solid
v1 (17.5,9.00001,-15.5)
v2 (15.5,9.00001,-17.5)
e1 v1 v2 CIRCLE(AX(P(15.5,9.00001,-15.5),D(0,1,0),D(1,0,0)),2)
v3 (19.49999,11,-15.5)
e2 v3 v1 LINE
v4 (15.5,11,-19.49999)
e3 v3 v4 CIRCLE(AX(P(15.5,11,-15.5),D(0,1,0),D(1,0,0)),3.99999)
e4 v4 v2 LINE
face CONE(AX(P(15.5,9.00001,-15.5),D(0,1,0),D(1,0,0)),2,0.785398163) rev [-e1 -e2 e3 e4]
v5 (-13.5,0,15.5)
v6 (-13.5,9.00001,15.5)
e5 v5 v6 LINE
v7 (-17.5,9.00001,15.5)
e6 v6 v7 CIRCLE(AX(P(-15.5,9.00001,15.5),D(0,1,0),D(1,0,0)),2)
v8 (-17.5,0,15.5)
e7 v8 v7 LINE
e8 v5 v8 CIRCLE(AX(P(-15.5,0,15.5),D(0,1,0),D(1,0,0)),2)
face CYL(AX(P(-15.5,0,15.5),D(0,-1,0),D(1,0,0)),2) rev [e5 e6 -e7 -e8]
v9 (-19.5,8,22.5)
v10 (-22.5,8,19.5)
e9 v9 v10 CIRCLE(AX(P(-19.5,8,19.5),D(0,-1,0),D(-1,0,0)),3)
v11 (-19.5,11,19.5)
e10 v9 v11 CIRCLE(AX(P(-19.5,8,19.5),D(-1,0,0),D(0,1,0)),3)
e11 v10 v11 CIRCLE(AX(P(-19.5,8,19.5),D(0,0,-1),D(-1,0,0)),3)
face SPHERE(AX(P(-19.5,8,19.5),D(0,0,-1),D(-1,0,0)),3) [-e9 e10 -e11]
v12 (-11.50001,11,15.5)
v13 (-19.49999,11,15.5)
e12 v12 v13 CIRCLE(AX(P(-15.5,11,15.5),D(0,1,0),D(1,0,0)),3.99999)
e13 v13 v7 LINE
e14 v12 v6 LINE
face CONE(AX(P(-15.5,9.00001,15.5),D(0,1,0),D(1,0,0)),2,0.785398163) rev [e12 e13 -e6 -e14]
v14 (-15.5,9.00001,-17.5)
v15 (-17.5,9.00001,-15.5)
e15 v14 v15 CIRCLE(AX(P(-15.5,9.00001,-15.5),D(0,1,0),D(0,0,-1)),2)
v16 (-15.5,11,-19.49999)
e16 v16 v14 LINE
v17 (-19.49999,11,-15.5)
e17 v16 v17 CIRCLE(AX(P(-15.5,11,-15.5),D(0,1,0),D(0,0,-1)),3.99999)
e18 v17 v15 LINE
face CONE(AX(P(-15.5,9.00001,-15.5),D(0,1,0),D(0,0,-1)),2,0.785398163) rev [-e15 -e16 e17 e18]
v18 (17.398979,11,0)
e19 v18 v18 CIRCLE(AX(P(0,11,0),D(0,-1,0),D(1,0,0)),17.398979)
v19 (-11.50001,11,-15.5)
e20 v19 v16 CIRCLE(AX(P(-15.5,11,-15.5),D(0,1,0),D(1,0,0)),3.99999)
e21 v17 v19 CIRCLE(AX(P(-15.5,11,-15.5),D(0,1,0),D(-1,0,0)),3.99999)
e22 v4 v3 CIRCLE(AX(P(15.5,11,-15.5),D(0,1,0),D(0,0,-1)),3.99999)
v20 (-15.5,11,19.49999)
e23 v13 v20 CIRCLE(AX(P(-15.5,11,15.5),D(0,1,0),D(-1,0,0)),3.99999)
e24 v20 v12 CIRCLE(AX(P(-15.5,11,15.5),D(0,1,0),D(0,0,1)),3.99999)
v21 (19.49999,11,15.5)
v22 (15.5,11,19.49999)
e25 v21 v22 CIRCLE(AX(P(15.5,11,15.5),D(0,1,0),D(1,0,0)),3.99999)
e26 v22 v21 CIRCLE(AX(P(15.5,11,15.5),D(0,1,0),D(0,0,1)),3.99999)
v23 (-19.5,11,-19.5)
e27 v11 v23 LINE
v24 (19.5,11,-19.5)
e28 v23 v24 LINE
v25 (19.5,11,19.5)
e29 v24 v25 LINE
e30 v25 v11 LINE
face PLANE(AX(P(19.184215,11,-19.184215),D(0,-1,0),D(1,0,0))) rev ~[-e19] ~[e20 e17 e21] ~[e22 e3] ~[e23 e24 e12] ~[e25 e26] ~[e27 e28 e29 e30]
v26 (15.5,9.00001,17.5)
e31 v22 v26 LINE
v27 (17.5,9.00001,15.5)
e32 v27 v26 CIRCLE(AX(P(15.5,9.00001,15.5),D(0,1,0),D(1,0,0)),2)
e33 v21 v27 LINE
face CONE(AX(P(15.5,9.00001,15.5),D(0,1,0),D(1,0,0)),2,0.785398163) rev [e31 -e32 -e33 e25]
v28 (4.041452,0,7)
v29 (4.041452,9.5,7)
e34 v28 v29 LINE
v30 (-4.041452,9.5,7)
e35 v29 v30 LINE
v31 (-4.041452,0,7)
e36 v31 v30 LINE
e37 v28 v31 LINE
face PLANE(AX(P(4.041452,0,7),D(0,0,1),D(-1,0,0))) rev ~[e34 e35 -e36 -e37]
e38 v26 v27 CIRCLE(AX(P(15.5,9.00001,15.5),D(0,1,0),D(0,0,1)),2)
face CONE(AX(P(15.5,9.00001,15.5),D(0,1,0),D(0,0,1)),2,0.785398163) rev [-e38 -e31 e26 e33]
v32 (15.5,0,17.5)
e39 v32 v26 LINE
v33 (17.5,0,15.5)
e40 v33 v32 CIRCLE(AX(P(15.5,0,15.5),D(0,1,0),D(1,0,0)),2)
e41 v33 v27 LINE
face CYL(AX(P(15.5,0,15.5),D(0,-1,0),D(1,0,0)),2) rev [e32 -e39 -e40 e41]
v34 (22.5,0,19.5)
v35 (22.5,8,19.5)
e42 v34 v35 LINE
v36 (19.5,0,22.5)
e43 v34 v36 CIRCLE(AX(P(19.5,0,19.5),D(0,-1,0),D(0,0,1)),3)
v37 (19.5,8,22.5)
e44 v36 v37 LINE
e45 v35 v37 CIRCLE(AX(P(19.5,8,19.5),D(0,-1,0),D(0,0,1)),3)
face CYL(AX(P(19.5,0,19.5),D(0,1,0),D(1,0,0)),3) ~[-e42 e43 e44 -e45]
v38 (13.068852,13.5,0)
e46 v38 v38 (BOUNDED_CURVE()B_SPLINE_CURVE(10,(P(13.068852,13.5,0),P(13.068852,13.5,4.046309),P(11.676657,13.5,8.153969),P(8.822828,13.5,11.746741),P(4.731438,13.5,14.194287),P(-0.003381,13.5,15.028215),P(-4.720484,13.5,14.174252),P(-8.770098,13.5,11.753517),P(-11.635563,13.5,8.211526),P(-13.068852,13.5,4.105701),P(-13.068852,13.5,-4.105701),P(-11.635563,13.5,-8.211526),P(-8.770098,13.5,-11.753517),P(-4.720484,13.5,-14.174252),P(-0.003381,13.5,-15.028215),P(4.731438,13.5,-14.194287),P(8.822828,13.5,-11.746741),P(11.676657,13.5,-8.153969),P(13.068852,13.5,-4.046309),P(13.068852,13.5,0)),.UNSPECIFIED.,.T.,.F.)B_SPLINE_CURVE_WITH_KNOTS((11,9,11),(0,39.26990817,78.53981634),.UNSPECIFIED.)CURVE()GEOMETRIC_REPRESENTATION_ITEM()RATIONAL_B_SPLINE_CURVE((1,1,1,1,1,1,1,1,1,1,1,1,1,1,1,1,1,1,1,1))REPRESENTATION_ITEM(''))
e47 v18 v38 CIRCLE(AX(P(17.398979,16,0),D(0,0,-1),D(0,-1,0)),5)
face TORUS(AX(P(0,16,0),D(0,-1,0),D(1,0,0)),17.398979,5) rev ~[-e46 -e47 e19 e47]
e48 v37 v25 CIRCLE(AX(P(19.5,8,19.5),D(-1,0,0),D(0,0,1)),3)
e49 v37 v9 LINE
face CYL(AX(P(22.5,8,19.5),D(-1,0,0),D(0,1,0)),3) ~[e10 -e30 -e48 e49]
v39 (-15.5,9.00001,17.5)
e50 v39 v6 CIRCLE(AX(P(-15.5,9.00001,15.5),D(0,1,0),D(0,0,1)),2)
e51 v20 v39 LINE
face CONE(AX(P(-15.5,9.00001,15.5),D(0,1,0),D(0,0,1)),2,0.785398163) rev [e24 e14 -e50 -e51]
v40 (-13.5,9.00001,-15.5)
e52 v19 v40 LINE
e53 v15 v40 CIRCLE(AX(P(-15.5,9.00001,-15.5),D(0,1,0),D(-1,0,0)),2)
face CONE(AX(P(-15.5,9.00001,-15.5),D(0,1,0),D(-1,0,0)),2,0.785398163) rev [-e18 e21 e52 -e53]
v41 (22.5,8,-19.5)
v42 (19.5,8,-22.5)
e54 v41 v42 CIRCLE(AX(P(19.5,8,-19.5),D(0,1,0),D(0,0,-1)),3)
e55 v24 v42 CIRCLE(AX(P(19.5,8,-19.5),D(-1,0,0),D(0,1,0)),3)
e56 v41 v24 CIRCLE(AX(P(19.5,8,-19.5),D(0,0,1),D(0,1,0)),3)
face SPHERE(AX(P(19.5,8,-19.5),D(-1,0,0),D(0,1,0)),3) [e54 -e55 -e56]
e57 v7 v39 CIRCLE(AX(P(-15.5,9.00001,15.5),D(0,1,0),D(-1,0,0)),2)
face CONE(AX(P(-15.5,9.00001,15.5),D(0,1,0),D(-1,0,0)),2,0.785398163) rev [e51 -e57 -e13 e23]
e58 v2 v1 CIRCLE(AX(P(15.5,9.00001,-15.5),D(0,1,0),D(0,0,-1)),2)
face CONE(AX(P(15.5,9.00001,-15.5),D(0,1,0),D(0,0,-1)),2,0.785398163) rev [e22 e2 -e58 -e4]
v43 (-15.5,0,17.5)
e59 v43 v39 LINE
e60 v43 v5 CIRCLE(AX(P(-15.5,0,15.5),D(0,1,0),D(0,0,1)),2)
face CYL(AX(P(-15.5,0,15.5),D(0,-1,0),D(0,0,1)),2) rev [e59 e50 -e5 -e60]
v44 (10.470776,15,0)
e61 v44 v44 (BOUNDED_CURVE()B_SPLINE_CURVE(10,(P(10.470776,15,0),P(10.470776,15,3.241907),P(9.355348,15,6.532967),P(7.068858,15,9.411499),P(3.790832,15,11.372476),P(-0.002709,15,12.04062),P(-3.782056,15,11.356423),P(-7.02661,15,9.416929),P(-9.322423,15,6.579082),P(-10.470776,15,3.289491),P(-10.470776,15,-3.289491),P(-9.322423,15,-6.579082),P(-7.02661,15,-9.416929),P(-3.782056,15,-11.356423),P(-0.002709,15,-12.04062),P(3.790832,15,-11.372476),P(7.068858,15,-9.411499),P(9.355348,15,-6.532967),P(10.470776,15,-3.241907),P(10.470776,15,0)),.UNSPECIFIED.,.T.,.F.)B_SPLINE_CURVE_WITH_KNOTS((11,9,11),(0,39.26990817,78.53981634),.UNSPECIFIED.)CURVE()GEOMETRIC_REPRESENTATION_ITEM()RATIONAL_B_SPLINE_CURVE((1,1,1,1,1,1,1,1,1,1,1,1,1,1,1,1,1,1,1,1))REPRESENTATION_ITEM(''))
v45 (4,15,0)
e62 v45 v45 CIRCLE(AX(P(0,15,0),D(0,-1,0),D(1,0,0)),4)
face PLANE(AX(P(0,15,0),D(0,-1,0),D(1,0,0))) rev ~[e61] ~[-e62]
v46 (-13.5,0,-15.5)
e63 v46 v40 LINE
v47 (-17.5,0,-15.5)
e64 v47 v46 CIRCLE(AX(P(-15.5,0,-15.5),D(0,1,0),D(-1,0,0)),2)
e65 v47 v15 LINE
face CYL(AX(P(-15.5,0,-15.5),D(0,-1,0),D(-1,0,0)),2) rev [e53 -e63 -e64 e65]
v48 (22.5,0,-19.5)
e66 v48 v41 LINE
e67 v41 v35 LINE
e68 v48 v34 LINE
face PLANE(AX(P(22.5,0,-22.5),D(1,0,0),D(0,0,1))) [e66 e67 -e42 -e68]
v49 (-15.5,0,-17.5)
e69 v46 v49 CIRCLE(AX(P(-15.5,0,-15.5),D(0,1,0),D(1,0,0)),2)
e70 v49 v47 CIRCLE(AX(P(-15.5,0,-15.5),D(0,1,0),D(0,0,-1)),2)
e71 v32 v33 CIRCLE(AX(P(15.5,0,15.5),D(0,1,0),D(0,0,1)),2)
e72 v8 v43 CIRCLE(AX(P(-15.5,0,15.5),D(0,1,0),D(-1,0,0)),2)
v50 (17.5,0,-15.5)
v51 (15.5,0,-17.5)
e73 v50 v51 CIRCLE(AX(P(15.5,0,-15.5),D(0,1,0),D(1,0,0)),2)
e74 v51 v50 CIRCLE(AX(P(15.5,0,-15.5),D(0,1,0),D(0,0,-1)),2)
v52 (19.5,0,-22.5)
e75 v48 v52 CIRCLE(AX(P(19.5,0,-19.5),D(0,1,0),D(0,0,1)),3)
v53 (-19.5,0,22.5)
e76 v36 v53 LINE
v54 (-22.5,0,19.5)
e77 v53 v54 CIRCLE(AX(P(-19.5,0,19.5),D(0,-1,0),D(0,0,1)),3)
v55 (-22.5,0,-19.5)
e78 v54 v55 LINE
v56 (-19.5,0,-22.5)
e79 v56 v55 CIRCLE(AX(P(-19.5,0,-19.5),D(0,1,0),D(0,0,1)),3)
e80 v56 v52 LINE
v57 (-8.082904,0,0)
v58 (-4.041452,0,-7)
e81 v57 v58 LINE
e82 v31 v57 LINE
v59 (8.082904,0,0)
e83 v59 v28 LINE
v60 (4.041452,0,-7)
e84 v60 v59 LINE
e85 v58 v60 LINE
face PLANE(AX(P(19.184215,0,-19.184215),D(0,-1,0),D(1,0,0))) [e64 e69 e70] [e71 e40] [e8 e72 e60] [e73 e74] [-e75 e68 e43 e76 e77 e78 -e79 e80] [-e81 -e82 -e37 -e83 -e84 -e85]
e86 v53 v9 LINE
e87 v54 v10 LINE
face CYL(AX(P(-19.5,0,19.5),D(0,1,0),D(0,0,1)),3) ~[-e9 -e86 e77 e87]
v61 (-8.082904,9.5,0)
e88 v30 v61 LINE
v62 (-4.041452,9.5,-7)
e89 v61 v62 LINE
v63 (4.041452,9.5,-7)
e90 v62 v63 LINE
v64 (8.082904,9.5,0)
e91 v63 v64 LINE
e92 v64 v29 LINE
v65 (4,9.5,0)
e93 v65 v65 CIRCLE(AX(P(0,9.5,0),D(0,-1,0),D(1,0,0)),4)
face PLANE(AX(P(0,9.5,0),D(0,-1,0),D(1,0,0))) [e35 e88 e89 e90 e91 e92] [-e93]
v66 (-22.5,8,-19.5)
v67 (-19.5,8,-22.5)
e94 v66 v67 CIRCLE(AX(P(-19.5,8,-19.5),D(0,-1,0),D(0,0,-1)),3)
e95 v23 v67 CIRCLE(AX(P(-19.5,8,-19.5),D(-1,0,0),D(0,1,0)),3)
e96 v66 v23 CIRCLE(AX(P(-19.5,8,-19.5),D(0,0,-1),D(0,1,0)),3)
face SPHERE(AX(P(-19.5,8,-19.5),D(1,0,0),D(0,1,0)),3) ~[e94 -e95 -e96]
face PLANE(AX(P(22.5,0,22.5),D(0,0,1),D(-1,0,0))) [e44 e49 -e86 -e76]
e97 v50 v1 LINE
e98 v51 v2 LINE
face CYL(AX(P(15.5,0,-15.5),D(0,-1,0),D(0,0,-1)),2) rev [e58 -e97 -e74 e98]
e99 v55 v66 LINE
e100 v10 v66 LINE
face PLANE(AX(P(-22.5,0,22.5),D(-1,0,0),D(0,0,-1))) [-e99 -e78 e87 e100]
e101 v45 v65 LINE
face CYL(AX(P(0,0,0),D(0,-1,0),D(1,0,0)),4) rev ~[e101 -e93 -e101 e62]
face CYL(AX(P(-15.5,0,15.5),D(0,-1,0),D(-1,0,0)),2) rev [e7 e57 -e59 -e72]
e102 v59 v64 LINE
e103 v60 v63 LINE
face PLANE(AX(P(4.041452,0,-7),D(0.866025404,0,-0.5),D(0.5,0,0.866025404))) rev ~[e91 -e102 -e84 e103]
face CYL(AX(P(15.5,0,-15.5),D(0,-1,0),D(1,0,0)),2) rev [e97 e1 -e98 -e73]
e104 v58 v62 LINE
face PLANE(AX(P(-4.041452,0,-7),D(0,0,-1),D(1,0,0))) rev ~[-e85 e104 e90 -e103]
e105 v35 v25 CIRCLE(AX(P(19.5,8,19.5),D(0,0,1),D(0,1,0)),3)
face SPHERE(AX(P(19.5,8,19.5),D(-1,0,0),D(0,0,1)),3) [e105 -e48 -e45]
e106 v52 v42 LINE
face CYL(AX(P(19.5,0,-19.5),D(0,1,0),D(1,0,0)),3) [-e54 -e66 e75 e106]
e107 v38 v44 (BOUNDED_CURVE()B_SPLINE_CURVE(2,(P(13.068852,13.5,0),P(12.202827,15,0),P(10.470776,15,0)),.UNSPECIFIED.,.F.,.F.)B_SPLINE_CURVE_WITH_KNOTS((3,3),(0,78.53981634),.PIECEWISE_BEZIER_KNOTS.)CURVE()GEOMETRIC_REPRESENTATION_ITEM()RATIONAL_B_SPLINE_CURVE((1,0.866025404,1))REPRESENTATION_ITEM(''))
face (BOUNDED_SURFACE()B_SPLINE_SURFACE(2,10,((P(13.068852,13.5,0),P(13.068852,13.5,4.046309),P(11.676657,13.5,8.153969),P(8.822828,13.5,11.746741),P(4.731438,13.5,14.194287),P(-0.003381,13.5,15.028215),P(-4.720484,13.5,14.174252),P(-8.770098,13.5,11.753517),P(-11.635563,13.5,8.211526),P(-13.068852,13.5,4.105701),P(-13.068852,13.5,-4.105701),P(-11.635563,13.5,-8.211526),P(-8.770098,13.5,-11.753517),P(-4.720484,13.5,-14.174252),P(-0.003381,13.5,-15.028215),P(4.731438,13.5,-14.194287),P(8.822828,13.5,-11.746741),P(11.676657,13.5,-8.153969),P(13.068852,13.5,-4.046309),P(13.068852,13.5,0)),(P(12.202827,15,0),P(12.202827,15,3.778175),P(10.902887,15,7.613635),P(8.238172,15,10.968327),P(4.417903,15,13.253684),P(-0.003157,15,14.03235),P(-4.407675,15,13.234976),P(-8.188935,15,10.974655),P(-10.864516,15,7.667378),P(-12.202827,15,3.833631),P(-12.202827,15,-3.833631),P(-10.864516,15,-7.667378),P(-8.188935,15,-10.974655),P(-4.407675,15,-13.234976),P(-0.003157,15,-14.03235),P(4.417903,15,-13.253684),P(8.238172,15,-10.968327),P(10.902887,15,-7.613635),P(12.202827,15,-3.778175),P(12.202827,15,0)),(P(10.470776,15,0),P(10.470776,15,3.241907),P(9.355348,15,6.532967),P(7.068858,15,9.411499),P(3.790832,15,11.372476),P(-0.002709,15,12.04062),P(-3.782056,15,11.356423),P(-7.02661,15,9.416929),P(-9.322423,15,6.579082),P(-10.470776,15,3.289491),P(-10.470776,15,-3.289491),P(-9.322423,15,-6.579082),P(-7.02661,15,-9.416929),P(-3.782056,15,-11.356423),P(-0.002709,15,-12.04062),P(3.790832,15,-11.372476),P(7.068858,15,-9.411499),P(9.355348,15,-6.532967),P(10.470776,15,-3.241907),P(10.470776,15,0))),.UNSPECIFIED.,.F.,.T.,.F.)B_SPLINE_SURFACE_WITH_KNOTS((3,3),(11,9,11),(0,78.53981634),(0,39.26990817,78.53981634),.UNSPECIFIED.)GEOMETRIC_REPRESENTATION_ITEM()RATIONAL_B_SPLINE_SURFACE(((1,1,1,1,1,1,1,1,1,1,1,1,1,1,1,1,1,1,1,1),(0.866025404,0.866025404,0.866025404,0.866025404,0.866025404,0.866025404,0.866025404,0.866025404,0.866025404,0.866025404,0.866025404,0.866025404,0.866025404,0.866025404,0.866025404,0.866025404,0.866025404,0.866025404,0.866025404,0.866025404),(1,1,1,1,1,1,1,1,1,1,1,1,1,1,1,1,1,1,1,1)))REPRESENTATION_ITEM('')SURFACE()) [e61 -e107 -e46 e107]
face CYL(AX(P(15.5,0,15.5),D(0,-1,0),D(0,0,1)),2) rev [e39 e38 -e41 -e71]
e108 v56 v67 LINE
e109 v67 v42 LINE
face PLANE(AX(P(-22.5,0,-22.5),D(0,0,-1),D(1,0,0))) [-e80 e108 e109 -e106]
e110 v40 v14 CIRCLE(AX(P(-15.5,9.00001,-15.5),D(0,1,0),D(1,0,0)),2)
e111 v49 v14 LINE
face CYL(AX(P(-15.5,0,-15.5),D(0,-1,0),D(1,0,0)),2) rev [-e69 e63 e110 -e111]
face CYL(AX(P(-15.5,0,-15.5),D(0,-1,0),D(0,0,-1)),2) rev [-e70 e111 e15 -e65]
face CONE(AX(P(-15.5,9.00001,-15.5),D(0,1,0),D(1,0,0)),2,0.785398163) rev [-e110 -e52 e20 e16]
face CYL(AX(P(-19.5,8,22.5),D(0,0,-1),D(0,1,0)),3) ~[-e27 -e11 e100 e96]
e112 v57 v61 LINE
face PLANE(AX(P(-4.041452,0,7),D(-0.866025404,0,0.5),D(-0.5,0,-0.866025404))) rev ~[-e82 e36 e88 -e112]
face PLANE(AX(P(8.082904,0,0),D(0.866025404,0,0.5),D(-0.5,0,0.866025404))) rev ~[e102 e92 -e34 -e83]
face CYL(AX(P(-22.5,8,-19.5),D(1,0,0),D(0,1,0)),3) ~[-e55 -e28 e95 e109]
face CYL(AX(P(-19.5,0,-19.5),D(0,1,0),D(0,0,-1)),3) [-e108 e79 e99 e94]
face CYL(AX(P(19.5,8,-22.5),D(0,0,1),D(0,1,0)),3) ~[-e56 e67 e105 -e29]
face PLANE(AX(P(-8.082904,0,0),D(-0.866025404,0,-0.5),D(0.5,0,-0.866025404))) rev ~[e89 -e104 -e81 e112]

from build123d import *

# Parameters (mm, degrees)
F0_R     = 12.5
F0_R_2   = 4
F1_DEPTH = 11
F2_DEPTH = 15
F3_DEPTH = 9.5
F5_R     = 3
F6_SIZE  = 1.99999


# Not quite as in the source:
# - a fillet or chamfer that OpenCascade refuses, or shapes differently, is made with other operations: its cross-section is extruded or revolved along the edge and cut away or added
# - a fillet or chamfer is up to 0.001 mm smaller than in the source, because OpenCascade refuses the exact size


with BuildPart() as f1:
    # F0 (on Front) → F1 (new body)
    with BuildSketch(Plane.XZ):
        with BuildLine():
            Line((15.5, -22.5), (22.5, -22.5))
            Line((22.5, -22.5), (22.5, -15.5))
            Line((22.5, -15.5), (17.5, -15.5))
            ThreePointArc((17.5, -15.5), (16.9142135624, -16.9142135624), (15.5, -17.5))
            Line((15.5, -17.5), (15.5, -22.5))
        make_face()
        with BuildLine():
            Line((-15.5, -22.5), (15.5, -22.5))
            Line((15.5, -22.5), (15.5, -17.5))
            ThreePointArc((15.5, -17.5), (14.0857864376, -14.0857864376), (17.5, -15.5))
            Line((17.5, -15.5), (22.5, -15.5))
            Line((22.5, -15.5), (22.5, 15.5))
            Line((22.5, 15.5), (17.5, 15.5))
            ThreePointArc((17.5, 15.5), (14.0857864376, 14.0857864376), (15.5, 17.5))
            Line((15.5, 17.5), (15.5, 22.5))
            Line((15.5, 22.5), (-15.5, 22.5))
            Line((-15.5, 22.5), (-15.5, 17.5))
            ThreePointArc((-15.5, 17.5), (-14.0857864376, 16.9142135624), (-13.5, 15.5))
            ThreePointArc((-13.5, 15.5), (-15.5, 13.5), (-17.5, 15.5))
            Line((-17.5, 15.5), (-22.5, 15.5))
            Line((-22.5, 15.5), (-22.5, -15.5))
            Line((-22.5, -15.5), (-17.5, -15.5))
            ThreePointArc((-17.5, -15.5), (-15.5, -13.5), (-13.5, -15.5))
            ThreePointArc((-13.5, -15.5), (-14.0857864376, -16.9142135624), (-15.5, -17.5))
            Line((-15.5, -17.5), (-15.5, -22.5))
        make_face()
        Circle(F0_R, mode=Mode.SUBTRACT)
        with BuildLine():
            Line((-22.5, -22.5), (-15.5, -22.5))
            Line((-15.5, -22.5), (-15.5, -17.5))
            ThreePointArc((-15.5, -17.5), (-16.9142135624, -16.9142135624), (-17.5, -15.5))
            Line((-17.5, -15.5), (-22.5, -15.5))
            Line((-22.5, -15.5), (-22.5, -22.5))
        make_face()
        with BuildLine():
            Line((17.5, 15.5), (22.5, 15.5))
            Line((22.5, 15.5), (22.5, 22.5))
            Line((22.5, 22.5), (15.5, 22.5))
            Line((15.5, 22.5), (15.5, 17.5))
            ThreePointArc((15.5, 17.5), (16.9142135624, 16.9142135624), (17.5, 15.5))
        make_face()
        with BuildLine():
            Line((-22.5, 22.5), (-22.5, 15.5))
            Line((-22.5, 15.5), (-17.5, 15.5))
            ThreePointArc((-17.5, 15.5), (-16.9142135624, 16.9142135624), (-15.5, 17.5))
            Line((-15.5, 17.5), (-15.5, 22.5))
            Line((-15.5, 22.5), (-22.5, 22.5))
        make_face()
        Circle(F0_R)
        Polygon((8.0829037687, 0), (4.0414518843, -7), (-4.0414518843, -7), (-8.0829037687, 0), (-4.0414518843, 7), (4.0414518843, 7), align=None, mode=Mode.SUBTRACT)
        Polygon((-4.0414518843, -7), (4.0414518843, -7), (8.0829037687, 0), (4.0414518843, 7), (-4.0414518843, 7), (-8.0829037687, 0), align=None)
        Circle(F0_R_2, mode=Mode.SUBTRACT)
    extrude(amount=-F1_DEPTH)

    # F0 (on Front) → F2 (join)
    with BuildSketch(Plane.XZ):
        Circle(F0_R)
        Polygon((8.0829037687, 0), (4.0414518843, -7), (-4.0414518843, -7), (-8.0829037687, 0), (-4.0414518843, 7), (4.0414518843, 7), align=None, mode=Mode.SUBTRACT)
        Polygon((-4.0414518843, -7), (4.0414518843, -7), (8.0829037687, 0), (4.0414518843, 7), (-4.0414518843, 7), (-8.0829037687, 0), align=None)
        Circle(F0_R_2, mode=Mode.SUBTRACT)
    extrude(amount=-F2_DEPTH)

    # F0 (on Front) → F3 (cut)
    with BuildSketch(Plane.XZ):
        Polygon((-4.0414518843, -7), (4.0414518843, -7), (8.0829037687, 0), (4.0414518843, 7), (-4.0414518843, 7), (-8.0829037687, 0), align=None)
        Circle(F0_R_2, mode=Mode.SUBTRACT)
    extrude(amount=-F3_DEPTH, mode=Mode.SUBTRACT)

    # F4: fillet of radius 5 on 1 edges, made by hand

    # F4_s1 → F4_t2 (revolve)
    with BuildSketch(Plane.XY):
        with BuildLine():
            ThreePointArc((17.3989794856, 11), (14.2367018254, 12.1270166538), (12.5, 15))
            Line((12.5, 15), (12.5, 11))
            Line((12.5, 11), (17.3989794856, 11))
        make_face()
    revolve(axis=Axis((0, 11, 0), (0, -1, 0)))

    # F5
    f5_edges = [f1.edges().sort_by_distance(p)[0] for p in [
        (-12.5, 15, 0),
        (0, 11, -22.5),
        (-22.5, 11, 0),
        (-22.5, 5.5, -22.5),
        (-22.5, 5.5, 22.5),
        (0, 11, 22.5),
        (22.5, 5.5, 22.5),
        (22.5, 11, 0),
        (22.5, 5.5, -22.5),
    ]]
    fillet(f5_edges, radius=F5_R)

    # F6 (size 2 in the source; OpenCascade refuses exactly that, so slightly less here)
    f6_edges = [f1.edges().sort_by_distance(p)[0] for p in [
        (-13.5, 11, 15.5),
        (-15.5, 11, -13.5),
        (15.5, 11, -13.5),
        (15.5, 11, 13.5),
    ]]
    chamfer(f6_edges, length=F6_SIZE)


solid = f1.part
